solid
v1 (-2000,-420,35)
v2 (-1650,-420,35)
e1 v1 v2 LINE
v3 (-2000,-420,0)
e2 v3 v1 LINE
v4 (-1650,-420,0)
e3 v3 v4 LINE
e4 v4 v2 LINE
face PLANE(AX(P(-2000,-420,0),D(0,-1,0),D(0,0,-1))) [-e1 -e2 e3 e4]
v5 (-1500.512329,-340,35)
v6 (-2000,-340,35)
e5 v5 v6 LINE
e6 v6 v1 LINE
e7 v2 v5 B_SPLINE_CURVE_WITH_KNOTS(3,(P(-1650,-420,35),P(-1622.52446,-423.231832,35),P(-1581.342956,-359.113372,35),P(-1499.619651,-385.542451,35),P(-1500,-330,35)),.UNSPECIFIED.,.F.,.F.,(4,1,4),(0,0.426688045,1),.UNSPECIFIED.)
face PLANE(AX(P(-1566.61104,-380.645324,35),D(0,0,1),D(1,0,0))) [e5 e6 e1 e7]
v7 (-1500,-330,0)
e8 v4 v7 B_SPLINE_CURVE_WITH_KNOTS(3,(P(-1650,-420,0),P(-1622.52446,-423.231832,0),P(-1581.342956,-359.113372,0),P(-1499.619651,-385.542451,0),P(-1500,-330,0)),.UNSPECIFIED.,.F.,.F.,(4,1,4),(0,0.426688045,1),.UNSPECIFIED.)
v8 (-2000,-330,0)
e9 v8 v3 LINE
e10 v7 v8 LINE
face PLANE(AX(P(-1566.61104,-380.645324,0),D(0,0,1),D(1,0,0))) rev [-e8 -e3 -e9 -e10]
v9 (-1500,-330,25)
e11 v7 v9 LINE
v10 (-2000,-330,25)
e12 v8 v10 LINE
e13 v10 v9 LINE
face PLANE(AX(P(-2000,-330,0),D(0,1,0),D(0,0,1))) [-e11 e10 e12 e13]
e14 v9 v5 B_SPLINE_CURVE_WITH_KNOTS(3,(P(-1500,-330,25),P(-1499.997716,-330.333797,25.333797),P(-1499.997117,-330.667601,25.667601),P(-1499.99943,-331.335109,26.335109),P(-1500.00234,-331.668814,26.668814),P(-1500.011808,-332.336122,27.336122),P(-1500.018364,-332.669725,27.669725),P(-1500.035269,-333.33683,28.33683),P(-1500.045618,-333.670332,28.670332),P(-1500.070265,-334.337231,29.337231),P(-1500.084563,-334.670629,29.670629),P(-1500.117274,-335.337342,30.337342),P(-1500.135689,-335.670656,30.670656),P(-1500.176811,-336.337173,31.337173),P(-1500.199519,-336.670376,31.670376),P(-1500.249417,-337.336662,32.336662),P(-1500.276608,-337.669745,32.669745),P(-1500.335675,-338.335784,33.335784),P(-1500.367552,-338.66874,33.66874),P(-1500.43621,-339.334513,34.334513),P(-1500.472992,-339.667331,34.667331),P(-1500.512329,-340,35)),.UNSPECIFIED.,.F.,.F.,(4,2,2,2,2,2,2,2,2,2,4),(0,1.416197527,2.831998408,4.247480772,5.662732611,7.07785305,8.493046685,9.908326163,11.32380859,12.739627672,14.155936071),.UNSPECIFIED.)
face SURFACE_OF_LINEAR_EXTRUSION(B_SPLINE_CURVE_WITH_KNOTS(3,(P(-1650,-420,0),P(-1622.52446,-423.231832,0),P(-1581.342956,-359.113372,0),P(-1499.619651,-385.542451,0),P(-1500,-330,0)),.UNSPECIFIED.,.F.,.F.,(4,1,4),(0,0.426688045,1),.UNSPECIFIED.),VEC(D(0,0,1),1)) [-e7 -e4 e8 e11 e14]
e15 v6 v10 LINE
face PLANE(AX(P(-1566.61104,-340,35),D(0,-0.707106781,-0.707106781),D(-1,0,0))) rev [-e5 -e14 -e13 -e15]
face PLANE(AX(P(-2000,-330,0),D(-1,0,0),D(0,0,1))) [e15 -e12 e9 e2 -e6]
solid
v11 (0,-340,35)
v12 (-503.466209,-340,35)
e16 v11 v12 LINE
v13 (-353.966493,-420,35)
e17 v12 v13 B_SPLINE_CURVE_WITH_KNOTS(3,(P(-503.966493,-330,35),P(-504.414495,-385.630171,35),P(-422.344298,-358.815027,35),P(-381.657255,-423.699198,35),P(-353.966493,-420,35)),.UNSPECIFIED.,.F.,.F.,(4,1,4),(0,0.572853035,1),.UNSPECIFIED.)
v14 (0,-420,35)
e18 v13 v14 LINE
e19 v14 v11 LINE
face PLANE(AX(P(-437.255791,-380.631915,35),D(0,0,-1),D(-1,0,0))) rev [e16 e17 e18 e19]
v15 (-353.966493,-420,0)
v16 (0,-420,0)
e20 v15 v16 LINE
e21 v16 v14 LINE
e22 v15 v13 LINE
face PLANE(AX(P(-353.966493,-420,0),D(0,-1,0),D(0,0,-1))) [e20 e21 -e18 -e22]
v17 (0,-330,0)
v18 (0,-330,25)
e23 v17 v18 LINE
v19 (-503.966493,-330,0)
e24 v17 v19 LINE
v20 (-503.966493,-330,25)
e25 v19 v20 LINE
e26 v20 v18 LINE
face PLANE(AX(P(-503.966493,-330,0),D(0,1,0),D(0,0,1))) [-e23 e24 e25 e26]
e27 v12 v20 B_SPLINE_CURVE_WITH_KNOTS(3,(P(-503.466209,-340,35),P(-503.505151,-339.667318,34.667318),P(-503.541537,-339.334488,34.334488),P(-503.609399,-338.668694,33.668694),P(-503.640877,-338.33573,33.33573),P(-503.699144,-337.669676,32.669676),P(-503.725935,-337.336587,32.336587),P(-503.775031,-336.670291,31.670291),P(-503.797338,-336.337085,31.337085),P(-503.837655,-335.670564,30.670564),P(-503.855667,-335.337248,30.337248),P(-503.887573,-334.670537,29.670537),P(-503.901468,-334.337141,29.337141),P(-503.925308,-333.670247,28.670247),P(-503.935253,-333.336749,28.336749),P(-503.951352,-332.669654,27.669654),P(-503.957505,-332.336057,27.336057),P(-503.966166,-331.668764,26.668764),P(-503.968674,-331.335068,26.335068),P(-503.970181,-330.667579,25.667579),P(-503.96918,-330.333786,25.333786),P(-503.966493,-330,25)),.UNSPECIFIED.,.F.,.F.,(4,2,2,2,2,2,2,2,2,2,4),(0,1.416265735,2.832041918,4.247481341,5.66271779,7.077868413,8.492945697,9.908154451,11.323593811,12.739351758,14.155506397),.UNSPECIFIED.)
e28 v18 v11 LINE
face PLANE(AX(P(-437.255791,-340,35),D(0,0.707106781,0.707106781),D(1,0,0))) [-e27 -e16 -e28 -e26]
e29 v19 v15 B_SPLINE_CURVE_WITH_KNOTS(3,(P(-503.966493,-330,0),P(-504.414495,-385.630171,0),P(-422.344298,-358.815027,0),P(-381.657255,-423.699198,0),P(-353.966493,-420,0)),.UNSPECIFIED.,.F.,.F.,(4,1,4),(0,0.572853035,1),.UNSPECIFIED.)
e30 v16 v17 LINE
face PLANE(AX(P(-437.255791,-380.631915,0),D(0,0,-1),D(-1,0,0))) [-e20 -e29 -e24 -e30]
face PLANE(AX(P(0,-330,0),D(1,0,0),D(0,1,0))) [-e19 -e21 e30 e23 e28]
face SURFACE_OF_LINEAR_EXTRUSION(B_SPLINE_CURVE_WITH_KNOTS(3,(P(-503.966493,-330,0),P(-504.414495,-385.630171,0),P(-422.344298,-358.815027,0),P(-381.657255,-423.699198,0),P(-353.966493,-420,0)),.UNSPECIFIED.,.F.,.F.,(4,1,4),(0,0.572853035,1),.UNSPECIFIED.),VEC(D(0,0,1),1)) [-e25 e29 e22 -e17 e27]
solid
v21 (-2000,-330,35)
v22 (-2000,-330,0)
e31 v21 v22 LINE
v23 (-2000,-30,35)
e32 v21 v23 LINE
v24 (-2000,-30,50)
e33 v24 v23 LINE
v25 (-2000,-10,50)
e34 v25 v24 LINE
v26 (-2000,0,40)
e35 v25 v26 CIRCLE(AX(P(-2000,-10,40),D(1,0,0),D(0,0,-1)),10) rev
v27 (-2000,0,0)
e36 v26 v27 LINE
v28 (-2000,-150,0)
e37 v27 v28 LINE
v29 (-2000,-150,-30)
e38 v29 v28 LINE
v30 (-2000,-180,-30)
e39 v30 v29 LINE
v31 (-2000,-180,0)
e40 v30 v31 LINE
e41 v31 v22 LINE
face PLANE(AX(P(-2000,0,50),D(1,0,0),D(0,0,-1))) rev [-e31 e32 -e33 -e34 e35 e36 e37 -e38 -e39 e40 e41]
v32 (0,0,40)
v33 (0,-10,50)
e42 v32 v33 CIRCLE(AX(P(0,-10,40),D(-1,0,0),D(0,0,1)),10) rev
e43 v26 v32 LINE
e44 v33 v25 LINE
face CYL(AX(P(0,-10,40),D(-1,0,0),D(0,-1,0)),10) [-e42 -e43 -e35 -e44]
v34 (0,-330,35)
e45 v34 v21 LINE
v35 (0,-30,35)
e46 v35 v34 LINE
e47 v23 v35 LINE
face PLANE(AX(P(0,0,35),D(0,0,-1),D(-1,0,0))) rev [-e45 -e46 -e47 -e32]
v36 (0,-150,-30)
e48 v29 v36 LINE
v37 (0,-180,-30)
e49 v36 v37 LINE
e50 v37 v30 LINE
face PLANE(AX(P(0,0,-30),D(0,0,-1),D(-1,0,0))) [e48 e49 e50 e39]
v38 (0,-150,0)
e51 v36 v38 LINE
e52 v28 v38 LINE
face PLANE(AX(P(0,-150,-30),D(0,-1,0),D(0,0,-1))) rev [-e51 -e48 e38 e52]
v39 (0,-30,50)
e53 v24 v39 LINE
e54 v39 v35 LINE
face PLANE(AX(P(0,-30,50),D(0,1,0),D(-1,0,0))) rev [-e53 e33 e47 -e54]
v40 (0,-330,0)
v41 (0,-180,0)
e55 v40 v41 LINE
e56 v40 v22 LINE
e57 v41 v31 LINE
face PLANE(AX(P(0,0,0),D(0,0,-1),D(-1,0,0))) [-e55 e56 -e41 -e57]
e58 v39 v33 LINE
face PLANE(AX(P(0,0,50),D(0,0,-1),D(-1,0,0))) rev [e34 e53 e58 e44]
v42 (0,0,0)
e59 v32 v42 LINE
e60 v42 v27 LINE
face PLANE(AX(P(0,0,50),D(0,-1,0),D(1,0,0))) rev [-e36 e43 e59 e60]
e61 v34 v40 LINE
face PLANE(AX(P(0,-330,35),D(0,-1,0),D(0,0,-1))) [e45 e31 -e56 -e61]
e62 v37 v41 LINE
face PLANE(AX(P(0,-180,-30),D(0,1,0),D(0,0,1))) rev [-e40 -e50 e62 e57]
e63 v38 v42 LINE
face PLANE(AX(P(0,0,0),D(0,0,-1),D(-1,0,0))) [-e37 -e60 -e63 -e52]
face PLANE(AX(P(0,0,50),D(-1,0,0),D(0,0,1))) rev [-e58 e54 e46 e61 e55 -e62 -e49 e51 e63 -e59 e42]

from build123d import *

# Parameters (mm, degrees)
SKETCH1_W             = 2000
SKETCH1_H             = 30
BOSS_EXTRUDE1_DEPTH   = 50
SKETCH2_W             = 2000
SKETCH2_H             = 300
BOSS_EXTRUDE2_DEPTH   = 35
FILLET1_R             = 10
BOSS_EXTRUDE3_DEPTH   = 35
BOSS_EXTRUDE3_2_DEPTH = 35
CHAMFER1_SIZE         = 10
CHAMFER2_SIZE         = 10
SKETCH6_W             = 2000
SKETCH6_H             = 30
BOSS_EXTRUDE4_DEPTH   = 30


with BuildPart() as part:
    # Sketch1 → Boss-Extrude1 (new body)
    with BuildSketch(Plane.XY):
        with Locations((-1000, -15)):
            Rectangle(SKETCH1_W, SKETCH1_H)
    extrude(amount=BOSS_EXTRUDE1_DEPTH)

    # Sketch2 → Boss-Extrude2 (add)
    with BuildSketch(Plane(origin=(0, 0, 0), x_dir=(-1, 0, 0), z_dir=(0, 0, -1))):
        with Locations((1000, -180)):
            Rectangle(SKETCH2_W, SKETCH2_H)
    extrude(amount=-BOSS_EXTRUDE2_DEPTH)

    # Fillet1
    fillet1_edges = [part.edges().sort_by_distance(p)[0] for p in [
        (-1000, 0, 50),
    ]]
    fillet(fillet1_edges, radius=FILLET1_R)

    # Sketch6 → Boss-Extrude4 (add)
    with BuildSketch(Plane(origin=(0, 0, 0), x_dir=(-1, 0, 0), z_dir=(0, 0, -1))):
        with Locations((1000, -165)):
            Rectangle(SKETCH6_W, SKETCH6_H)
    extrude(amount=BOSS_EXTRUDE4_DEPTH)


with BuildPart() as body_2:
    # Sketch3 → Boss-Extrude3 (new body)
    with BuildSketch(Plane.XY.offset(35)):
        with BuildLine():
            Line((-503.966493072, -330), (0, -330))
            Line((0, -330), (0, -420))
            Line((0, -420), (-353.966493072, -420))
            add(Edge.make_bspline(
                [(-503.966493072, -330), (-504.414495216, -385.6301706), (-422.344298333, -358.815027436), (-381.657255227, -423.699197751), (-353.966493072, -420)],
                knots=[0, 0, 0, 0, 0.572853035, 1, 1, 1, 1], degree=3))
        make_face()
    extrude(amount=-BOSS_EXTRUDE3_DEPTH)

    # Chamfer2
    chamfer2_edges = [body_2.edges().sort_by_distance(p)[0] for p in [
        (-251.983246536, -330, 35),
    ]]
    chamfer(chamfer2_edges, length=CHAMFER2_SIZE)


with BuildPart() as body_3:
    # Sketch3 → Boss-Extrude3 2 (new body)
    with BuildSketch(Plane.XY.offset(35)):
        with BuildLine():
            Line((-2000, -330), (-1500, -330))
            add(Edge.make_bspline(
                [(-1500, -330), (-1499.61965149, -385.542451224), (-1581.342955777, -359.113372387), (-1622.524460383, -423.231832414), (-1650, -420)],
                knots=[0, 0, 0, 0, 0.573311955, 1, 1, 1, 1], degree=3))
            Line((-1650, -420), (-2000, -420))
            Line((-2000, -420), (-2000, -330))
        make_face()
    extrude(amount=-BOSS_EXTRUDE3_2_DEPTH)

    # Chamfer1
    chamfer1_edges = [body_3.edges().sort_by_distance(p)[0] for p in [
        (-1750, -330, 35),
    ]]
    chamfer(chamfer1_edges, length=CHAMFER1_SIZE)


solid = Compound([part.part, body_2.part, body_3.part])
